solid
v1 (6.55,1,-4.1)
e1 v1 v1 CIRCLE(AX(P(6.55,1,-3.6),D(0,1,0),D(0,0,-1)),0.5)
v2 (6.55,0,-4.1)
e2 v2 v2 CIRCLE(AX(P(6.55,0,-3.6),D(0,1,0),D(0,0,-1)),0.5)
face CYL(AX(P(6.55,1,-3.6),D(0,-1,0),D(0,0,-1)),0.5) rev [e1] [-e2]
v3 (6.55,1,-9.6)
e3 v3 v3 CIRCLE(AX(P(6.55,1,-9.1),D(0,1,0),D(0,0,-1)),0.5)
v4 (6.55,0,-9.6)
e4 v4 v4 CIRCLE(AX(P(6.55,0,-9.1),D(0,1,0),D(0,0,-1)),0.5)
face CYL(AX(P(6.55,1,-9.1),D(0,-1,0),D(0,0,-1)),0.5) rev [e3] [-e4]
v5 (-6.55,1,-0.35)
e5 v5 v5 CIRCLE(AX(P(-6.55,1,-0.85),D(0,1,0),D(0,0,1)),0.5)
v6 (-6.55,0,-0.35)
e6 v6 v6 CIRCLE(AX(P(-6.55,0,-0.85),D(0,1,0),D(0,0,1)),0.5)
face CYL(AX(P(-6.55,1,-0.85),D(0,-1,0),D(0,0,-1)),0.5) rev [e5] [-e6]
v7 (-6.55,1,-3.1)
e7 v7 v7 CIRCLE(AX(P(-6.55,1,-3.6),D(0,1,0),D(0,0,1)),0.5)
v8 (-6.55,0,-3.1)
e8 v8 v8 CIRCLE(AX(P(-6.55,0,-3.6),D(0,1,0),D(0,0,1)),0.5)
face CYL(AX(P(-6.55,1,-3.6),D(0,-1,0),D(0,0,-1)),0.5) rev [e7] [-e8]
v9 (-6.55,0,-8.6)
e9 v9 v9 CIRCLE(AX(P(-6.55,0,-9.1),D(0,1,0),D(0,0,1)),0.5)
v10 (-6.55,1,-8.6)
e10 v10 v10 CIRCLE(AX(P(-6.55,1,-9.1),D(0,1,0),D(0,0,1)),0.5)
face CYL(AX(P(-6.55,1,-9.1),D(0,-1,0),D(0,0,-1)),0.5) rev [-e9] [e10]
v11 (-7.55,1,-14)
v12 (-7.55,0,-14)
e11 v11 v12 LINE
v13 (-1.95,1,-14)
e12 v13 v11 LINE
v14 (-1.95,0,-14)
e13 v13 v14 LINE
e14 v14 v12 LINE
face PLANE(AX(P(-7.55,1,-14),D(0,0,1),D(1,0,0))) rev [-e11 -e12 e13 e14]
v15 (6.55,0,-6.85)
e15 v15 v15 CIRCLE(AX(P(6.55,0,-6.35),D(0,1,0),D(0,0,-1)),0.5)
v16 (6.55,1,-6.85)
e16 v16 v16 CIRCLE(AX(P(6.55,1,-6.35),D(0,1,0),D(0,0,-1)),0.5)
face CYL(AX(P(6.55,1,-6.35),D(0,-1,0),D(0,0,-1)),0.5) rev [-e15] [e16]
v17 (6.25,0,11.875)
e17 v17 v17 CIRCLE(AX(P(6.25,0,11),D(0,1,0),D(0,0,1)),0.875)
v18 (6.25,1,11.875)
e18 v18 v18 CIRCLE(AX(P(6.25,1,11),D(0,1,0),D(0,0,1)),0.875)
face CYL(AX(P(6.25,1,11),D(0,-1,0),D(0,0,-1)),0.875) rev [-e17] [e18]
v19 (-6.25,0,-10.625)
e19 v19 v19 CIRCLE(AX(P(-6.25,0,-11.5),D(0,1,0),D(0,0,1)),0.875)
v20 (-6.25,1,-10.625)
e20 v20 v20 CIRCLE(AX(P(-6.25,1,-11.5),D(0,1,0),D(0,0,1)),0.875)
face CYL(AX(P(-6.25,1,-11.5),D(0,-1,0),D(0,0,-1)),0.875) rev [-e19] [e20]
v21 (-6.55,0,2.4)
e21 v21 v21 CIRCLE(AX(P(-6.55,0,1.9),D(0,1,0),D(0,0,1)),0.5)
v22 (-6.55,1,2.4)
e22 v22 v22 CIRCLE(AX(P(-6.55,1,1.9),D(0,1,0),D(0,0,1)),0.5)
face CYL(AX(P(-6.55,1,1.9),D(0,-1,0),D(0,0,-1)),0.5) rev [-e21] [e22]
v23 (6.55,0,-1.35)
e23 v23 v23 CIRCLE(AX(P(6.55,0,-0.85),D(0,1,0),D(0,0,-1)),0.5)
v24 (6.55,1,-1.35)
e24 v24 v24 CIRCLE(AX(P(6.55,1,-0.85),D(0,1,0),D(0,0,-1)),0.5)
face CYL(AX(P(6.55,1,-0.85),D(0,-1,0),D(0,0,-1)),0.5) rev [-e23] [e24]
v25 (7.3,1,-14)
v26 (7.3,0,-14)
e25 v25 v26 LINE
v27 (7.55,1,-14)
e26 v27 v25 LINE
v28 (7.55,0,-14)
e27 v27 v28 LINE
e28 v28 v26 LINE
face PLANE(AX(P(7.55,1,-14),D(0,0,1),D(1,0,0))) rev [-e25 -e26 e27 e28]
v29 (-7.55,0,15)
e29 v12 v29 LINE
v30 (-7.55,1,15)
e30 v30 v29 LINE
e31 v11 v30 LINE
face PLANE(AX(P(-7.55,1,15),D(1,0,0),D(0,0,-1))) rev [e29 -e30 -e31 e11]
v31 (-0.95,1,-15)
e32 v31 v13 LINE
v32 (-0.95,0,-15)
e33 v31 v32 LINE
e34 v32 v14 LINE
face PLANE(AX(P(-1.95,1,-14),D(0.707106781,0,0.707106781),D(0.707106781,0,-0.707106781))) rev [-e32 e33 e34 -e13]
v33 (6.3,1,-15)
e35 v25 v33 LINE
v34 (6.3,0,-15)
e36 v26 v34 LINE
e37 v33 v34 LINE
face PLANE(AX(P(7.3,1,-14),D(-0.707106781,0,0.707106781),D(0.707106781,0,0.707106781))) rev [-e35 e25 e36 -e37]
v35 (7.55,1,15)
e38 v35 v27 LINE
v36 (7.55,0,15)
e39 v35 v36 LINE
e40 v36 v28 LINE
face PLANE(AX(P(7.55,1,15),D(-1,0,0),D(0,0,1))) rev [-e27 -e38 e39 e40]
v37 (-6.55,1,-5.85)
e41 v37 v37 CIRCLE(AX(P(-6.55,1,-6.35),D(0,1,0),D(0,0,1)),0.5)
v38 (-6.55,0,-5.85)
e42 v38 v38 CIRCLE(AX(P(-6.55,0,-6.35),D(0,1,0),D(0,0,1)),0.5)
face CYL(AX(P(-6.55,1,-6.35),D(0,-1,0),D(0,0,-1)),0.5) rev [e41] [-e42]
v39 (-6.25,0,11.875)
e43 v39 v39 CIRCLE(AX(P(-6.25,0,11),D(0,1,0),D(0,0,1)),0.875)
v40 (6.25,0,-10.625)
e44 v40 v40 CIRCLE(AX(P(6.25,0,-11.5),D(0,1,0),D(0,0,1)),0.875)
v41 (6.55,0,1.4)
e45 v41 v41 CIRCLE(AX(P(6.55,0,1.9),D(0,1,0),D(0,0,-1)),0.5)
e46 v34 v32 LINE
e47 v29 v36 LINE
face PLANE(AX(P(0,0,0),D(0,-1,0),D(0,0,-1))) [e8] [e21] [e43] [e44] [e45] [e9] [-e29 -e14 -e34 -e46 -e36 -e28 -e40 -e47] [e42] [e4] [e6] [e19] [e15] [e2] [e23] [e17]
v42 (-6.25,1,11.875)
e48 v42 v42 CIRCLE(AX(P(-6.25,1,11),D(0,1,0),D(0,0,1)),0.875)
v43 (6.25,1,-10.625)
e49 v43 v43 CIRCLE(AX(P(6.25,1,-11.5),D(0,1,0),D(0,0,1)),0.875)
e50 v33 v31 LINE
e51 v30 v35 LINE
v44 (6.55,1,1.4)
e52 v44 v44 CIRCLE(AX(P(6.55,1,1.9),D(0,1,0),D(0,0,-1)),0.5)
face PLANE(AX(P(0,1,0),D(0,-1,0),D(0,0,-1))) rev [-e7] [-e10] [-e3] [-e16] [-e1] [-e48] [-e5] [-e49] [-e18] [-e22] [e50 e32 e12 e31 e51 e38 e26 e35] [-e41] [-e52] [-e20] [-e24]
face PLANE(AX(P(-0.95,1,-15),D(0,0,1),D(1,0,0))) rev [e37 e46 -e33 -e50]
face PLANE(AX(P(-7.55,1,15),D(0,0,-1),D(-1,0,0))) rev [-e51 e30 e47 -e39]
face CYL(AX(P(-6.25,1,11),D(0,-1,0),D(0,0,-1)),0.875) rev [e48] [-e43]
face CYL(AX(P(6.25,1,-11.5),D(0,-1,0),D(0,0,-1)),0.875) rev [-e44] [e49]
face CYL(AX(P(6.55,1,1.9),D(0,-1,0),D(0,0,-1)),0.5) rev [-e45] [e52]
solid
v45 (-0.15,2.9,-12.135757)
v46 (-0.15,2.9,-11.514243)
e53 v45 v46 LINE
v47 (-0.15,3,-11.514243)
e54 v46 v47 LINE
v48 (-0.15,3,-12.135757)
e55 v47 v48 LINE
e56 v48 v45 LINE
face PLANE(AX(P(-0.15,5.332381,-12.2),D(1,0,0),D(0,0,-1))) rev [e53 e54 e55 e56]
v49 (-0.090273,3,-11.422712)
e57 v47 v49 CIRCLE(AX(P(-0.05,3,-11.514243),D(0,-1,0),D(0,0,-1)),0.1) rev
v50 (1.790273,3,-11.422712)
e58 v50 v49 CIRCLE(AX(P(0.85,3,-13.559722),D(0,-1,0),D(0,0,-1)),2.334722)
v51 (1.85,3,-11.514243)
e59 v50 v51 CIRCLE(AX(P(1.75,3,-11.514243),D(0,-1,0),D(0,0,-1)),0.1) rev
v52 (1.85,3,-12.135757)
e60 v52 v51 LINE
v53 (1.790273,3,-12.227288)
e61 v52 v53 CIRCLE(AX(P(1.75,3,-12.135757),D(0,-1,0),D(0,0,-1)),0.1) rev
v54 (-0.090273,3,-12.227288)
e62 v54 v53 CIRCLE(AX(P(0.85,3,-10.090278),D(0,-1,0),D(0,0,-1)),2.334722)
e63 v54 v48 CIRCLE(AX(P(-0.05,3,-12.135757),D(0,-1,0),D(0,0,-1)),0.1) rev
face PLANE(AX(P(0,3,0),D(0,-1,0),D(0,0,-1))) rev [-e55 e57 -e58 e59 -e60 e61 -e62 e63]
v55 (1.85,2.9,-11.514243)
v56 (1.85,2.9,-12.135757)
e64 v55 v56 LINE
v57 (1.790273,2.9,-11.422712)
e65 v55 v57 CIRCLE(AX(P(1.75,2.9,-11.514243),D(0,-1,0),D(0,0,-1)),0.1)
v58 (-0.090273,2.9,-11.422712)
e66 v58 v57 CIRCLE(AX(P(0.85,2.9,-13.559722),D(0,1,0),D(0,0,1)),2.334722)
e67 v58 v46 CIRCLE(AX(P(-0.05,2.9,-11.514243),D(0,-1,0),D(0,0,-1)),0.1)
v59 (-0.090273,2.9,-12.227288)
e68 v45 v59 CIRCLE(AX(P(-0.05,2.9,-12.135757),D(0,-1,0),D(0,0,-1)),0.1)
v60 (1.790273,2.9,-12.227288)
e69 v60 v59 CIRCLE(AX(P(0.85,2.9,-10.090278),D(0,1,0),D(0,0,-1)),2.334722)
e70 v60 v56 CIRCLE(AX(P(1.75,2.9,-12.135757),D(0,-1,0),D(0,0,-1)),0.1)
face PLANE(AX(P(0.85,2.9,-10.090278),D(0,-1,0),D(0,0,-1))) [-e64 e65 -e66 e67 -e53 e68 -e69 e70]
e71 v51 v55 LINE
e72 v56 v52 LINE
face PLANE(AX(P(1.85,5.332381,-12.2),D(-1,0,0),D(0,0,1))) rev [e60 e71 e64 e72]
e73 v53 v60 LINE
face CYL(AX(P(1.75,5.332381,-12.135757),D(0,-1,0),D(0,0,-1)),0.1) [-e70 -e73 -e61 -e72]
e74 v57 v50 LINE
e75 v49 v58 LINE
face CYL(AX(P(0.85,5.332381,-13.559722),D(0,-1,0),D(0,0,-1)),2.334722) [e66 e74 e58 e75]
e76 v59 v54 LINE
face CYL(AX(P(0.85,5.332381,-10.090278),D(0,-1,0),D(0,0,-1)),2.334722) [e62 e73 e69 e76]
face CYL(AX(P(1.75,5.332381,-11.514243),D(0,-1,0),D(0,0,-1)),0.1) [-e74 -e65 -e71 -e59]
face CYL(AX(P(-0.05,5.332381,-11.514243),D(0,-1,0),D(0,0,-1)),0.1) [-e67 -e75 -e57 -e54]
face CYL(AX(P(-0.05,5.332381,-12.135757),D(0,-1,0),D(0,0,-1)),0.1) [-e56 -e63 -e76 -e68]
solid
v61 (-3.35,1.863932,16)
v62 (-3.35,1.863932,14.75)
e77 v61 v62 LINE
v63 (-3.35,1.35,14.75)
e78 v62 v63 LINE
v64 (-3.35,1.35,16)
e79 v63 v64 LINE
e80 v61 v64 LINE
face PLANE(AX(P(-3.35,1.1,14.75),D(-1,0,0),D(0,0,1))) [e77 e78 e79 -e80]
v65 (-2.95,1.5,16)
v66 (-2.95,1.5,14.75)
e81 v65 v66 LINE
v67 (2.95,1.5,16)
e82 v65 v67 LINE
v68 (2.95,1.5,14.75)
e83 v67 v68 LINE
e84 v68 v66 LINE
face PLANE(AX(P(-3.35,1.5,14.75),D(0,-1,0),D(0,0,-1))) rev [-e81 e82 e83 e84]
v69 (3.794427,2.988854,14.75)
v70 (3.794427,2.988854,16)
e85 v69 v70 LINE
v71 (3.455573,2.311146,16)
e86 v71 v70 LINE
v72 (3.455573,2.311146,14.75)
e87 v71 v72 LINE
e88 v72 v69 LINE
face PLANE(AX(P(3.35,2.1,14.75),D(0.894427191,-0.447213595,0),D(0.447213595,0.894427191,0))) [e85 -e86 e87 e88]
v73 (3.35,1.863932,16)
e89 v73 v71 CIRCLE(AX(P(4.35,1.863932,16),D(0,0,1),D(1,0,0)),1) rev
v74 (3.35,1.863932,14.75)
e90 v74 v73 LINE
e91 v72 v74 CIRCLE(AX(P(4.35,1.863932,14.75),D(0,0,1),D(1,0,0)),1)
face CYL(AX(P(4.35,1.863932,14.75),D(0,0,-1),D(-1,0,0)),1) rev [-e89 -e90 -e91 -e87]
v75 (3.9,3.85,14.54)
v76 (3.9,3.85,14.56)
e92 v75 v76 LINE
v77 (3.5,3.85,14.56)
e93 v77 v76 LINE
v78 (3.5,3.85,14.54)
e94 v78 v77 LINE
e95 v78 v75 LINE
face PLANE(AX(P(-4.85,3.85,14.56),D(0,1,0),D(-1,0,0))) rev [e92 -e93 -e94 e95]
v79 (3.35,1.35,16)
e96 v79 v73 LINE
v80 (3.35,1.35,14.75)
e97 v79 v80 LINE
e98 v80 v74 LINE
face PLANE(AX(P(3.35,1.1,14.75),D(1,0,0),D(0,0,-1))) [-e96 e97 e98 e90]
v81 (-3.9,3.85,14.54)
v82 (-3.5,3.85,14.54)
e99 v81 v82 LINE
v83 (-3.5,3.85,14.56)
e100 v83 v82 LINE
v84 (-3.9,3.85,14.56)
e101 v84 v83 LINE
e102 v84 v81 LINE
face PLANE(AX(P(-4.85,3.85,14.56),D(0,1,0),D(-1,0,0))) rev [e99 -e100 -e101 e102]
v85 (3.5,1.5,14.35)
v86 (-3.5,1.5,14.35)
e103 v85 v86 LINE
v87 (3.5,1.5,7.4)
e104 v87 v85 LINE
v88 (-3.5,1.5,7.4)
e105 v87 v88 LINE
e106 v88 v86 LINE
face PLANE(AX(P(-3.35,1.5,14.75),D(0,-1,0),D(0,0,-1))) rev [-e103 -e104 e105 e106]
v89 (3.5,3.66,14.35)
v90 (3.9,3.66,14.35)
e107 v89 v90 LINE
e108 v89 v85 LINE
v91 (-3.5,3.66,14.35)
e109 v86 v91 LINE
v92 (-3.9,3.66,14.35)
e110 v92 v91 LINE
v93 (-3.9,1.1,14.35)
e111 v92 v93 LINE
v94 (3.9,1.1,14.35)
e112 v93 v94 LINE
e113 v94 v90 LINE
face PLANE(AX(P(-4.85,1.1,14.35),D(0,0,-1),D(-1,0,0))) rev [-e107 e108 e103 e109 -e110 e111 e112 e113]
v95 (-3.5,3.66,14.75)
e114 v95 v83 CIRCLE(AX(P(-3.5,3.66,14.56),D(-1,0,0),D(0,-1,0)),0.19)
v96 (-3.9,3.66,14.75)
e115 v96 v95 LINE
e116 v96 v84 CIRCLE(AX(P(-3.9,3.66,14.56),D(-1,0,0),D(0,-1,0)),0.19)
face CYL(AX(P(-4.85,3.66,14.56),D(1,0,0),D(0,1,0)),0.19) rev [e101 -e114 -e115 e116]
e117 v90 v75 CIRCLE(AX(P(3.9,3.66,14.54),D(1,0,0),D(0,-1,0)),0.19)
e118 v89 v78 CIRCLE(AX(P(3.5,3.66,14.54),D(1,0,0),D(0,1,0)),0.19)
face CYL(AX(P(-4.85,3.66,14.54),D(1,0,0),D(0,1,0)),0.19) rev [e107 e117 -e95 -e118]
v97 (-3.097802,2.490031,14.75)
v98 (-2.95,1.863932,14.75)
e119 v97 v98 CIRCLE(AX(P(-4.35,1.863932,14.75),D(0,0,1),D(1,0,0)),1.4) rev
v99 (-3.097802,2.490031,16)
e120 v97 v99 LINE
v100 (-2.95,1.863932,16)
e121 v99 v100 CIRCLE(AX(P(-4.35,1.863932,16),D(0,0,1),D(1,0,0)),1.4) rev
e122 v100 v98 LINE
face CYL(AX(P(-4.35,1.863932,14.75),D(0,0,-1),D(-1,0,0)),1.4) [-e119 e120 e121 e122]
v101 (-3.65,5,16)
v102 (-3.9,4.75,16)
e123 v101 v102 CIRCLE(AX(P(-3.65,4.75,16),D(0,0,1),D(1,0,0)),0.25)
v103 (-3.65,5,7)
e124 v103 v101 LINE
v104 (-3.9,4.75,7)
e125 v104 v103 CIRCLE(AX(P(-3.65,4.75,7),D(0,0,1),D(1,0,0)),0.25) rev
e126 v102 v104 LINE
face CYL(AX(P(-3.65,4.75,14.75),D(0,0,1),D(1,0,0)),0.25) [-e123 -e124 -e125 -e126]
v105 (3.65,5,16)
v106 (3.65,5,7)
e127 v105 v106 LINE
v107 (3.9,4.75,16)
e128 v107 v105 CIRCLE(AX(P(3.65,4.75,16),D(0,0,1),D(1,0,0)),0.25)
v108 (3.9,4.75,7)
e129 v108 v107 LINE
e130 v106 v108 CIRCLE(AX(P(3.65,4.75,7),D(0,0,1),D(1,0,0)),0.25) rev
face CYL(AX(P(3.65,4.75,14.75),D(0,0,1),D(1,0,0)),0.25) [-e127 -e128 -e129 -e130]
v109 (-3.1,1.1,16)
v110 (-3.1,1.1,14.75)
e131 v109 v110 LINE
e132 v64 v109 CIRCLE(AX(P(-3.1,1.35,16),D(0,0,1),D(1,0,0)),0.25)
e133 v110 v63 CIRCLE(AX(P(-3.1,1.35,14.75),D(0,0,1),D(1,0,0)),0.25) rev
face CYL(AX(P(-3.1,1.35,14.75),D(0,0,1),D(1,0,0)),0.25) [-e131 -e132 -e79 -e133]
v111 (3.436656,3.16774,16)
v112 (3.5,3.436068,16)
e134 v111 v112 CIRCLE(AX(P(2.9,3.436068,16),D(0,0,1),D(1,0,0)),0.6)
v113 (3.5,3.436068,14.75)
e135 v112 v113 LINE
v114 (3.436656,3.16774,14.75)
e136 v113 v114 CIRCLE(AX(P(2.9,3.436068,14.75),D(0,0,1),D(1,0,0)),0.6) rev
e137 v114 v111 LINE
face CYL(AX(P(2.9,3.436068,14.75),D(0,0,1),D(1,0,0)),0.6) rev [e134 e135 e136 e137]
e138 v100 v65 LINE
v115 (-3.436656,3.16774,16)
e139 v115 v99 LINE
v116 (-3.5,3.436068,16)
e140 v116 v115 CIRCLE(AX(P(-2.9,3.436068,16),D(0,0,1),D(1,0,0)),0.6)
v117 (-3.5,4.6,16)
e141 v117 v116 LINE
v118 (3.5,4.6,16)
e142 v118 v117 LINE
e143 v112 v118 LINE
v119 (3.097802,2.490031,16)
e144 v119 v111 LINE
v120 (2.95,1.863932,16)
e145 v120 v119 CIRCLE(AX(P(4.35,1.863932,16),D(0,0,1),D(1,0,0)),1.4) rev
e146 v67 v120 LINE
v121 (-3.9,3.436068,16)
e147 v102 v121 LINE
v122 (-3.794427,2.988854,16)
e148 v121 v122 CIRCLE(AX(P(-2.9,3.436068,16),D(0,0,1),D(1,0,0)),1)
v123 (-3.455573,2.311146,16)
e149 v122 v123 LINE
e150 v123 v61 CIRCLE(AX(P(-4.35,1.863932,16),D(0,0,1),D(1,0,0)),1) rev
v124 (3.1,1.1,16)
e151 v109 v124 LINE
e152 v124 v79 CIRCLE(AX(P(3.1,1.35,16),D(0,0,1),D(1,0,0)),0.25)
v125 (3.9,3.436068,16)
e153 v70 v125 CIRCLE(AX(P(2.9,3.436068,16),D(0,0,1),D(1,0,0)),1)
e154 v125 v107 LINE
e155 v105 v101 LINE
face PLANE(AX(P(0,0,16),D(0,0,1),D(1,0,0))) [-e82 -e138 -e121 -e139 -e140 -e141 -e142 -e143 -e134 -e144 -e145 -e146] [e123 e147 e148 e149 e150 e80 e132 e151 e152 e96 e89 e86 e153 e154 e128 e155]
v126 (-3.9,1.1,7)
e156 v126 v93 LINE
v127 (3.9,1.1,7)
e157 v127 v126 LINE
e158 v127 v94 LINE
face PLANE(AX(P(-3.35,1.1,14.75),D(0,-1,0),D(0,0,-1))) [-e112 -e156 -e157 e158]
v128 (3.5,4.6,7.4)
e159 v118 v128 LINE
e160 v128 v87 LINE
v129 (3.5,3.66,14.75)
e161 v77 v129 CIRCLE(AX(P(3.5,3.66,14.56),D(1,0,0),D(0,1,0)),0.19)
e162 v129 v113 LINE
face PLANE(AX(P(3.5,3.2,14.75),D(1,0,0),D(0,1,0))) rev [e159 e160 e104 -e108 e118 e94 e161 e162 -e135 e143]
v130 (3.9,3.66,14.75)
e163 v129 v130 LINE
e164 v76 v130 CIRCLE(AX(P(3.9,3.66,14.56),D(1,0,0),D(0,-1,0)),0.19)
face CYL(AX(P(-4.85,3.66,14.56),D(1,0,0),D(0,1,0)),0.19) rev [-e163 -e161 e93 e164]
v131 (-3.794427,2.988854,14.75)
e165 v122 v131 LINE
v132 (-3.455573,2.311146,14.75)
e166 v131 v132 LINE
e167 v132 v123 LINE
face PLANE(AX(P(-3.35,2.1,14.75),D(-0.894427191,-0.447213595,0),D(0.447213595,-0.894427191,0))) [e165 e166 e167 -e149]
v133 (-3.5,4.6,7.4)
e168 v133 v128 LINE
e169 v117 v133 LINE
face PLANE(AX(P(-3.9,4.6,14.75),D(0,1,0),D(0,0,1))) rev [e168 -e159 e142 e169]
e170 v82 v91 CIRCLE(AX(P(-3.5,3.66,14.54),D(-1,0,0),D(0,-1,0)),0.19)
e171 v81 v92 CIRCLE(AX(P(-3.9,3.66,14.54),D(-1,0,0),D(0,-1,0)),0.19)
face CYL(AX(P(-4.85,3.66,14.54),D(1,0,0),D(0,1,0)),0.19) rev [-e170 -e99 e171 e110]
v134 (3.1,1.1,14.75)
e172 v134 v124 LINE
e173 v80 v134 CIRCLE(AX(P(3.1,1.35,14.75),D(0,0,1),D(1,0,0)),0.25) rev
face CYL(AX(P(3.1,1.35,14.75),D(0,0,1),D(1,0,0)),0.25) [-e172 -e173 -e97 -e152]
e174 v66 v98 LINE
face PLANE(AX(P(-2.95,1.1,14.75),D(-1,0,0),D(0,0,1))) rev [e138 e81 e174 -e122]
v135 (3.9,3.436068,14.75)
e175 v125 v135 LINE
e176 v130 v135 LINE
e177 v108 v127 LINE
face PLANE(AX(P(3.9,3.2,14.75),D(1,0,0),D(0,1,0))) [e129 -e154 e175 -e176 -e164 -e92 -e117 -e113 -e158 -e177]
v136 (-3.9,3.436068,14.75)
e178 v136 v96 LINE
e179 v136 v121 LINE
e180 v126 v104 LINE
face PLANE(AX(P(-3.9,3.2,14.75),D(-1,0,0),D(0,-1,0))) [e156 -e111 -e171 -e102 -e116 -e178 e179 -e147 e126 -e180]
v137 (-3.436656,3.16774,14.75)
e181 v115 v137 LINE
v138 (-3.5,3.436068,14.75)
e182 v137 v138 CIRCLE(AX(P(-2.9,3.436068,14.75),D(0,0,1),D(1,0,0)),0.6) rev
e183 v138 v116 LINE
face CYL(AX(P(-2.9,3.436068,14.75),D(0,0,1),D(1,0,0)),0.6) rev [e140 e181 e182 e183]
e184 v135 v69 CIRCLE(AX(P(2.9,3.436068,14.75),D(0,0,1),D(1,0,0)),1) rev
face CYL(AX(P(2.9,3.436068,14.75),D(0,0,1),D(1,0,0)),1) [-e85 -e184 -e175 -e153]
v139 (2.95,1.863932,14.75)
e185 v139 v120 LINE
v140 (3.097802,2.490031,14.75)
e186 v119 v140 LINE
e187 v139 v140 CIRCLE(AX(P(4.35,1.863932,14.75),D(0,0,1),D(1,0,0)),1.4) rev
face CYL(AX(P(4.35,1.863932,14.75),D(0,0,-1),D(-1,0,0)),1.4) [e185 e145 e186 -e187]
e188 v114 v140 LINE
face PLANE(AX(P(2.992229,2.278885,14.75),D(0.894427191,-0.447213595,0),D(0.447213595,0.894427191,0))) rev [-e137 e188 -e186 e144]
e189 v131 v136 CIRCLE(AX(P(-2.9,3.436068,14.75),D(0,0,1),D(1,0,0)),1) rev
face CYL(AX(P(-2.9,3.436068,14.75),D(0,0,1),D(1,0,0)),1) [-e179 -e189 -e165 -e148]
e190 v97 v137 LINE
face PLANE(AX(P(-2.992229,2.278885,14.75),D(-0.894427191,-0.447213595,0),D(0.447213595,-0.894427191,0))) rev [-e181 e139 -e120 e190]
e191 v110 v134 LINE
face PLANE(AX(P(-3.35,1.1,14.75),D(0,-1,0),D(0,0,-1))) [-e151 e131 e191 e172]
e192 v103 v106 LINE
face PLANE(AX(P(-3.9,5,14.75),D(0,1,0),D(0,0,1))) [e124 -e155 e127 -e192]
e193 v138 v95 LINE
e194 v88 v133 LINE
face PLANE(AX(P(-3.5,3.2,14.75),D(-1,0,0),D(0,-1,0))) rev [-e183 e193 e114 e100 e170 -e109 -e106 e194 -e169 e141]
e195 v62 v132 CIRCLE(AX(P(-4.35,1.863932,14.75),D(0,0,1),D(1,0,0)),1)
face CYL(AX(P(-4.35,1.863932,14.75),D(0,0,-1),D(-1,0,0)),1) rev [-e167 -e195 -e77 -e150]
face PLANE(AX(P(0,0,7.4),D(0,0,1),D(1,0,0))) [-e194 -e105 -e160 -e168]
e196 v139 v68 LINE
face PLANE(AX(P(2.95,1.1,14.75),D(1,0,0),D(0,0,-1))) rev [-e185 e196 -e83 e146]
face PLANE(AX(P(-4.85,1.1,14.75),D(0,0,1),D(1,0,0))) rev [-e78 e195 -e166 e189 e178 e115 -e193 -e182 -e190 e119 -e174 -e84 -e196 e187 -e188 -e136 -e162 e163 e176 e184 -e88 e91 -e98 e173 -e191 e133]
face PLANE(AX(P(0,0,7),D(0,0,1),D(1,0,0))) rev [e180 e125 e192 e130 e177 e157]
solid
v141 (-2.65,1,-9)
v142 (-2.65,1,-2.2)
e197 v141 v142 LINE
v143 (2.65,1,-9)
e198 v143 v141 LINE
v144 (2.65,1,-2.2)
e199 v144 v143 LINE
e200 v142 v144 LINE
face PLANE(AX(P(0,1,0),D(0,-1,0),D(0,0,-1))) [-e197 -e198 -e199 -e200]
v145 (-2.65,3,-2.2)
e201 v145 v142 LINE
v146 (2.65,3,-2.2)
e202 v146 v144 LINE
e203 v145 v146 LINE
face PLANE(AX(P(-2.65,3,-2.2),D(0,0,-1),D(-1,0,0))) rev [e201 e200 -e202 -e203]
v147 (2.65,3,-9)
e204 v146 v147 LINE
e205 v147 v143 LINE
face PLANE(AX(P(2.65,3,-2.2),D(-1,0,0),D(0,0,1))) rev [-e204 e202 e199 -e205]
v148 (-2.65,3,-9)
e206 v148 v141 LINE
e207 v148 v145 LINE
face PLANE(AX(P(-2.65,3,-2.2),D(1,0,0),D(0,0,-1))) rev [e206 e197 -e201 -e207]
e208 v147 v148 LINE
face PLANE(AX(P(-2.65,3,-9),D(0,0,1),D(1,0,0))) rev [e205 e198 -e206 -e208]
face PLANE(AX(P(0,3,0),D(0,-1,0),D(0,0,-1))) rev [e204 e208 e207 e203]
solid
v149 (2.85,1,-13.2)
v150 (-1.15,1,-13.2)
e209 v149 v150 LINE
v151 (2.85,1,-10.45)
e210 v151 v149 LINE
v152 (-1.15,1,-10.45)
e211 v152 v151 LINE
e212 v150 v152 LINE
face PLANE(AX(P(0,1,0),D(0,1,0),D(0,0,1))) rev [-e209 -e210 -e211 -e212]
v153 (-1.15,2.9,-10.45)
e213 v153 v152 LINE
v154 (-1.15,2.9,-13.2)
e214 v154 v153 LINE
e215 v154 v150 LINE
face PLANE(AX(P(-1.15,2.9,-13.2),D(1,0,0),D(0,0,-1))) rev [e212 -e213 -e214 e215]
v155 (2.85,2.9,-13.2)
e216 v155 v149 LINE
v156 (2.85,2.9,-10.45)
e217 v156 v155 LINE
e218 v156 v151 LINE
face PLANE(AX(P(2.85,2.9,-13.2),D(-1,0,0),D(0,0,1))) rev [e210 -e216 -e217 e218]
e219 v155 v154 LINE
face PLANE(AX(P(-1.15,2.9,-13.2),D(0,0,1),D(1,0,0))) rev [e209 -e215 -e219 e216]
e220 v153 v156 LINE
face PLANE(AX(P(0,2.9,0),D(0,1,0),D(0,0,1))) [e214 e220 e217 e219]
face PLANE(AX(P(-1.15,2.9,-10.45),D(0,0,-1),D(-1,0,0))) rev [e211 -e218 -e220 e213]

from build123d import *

# Parameters (mm, degrees)
SKETCH1_R                = 0.875
SKETCH1_R_2              = 0.5
BOSS_EXTRUDE1_DEPTH      = 1
BOSS_EXTRUDE2_DEPTH      = 1
BOSS_EXTRUDE2_DEPTH_BACK = 0.25
SKETCH3_W                = 7.8
SKETCH3_H                = 3.9
BOSS_EXTRUDE3_DEPTH      = 7.75
FILLET1_R                = 0.25
FILLET2_R                = 1
SHELL1_START             = 7.4
SHELL1_DEPTH             = 8.6
SHELL1_2_DEPTH           = 6.95
CUT_EXTRUDE1_DEPTH       = 8.75
SKETCH6_W                = 5.3
SKETCH6_H                = 6.8
BOSS_EXTRUDE4_DEPTH      = 2
SKETCH7_W                = 4
SKETCH7_H                = 2.75
BOSS_EXTRUDE5_DEPTH      = 1.9
BOSS_EXTRUDE6_DEPTH      = 0.1
FILLET3_R                = 0.1


# Read off the part's stored shape, not the designer's step: Shell1
with BuildPart() as part:
    # Sketch1 → Boss-Extrude1 (new body)
    with BuildSketch(Plane(origin=(0, 0, 0), x_dir=(1, 0, 0), z_dir=(0, 1, 0))):
        Polygon((-7.55, 14), (-1.95, 14), (-0.95, 15), (6.3, 15), (7.3, 14), (7.55, 14), (7.55, -15), (-7.55, -15), align=None)
        with Locations(Location((-6.25, 11.5, 0), (0, 0, 270))):
            Circle(SKETCH1_R, mode=Mode.SUBTRACT)
        with Locations(Location((6.25, 11.5, 0), (0, 0, 270))):
            Circle(SKETCH1_R, mode=Mode.SUBTRACT)
        with Locations(Location((-6.25, -11, 0), (0, 0, 270))):
            Circle(SKETCH1_R, mode=Mode.SUBTRACT)
        with Locations(Location((6.25, -11, 0), (0, 0, 270))):
            Circle(SKETCH1_R, mode=Mode.SUBTRACT)
        with Locations(Location((-6.55, 9.1, 0), (0, 0, 270))):
            Circle(SKETCH1_R_2, mode=Mode.SUBTRACT)
        with Locations(Location((-6.55, -1.9, 0), (0, 0, 270))):
            Circle(SKETCH1_R_2, mode=Mode.SUBTRACT)
        with Locations(Location((-6.55, 3.6, 0), (0, 0, 270))):
            Circle(SKETCH1_R_2, mode=Mode.SUBTRACT)
        with Locations(Location((-6.55, 6.35, 0), (0, 0, 270))):
            Circle(SKETCH1_R_2, mode=Mode.SUBTRACT)
        with Locations(Location((-6.55, 0.85, 0), (0, 0, 270))):
            Circle(SKETCH1_R_2, mode=Mode.SUBTRACT)
        with Locations(Location((6.55, -1.9, 0), (0, 0, 90))):
            Circle(SKETCH1_R_2, mode=Mode.SUBTRACT)
        with Locations(Location((6.55, 0.85, 0), (0, 0, 90))):
            Circle(SKETCH1_R_2, mode=Mode.SUBTRACT)
        with Locations(Location((6.55, 3.6, 0), (0, 0, 90))):
            Circle(SKETCH1_R_2, mode=Mode.SUBTRACT)
        with Locations(Location((6.55, 6.35, 0), (0, 0, 90))):
            Circle(SKETCH1_R_2, mode=Mode.SUBTRACT)
        with Locations(Location((6.55, 9.1, 0), (0, 0, 90))):
            Circle(SKETCH1_R_2, mode=Mode.SUBTRACT)
    extrude(amount=BOSS_EXTRUDE1_DEPTH)


with BuildPart() as body_2:
    # Sketch2 → Boss-Extrude2 (new, two sides: drawn at the far end of the back side and taken through both)
    with BuildSketch(Plane.XY.offset(15).offset(-BOSS_EXTRUDE2_DEPTH_BACK)):
        Polygon((3.35, 1.1), (3.35, 2.1), (3.9, 3.2), (3.9, 5), (-3.9, 5), (-3.9, 3.2), (-3.35, 2.1), (-3.35, 1.1), align=None)
    extrude(amount=BOSS_EXTRUDE2_DEPTH + BOSS_EXTRUDE2_DEPTH_BACK)

    # Sketch3 → Boss-Extrude3 (add)
    with BuildSketch(Plane(origin=(0, 0, 14.75), x_dir=(-1, 0, 0), z_dir=(0, 0, -1))):
        with Locations((0, 3.05)):
            Rectangle(SKETCH3_W, SKETCH3_H)
    extrude(amount=BOSS_EXTRUDE3_DEPTH)

    # Fillet1
    fillet1_edges = [body_2.edges().sort_by_distance(p)[0] for p in [
        (3.35, 1.1, 15.375),
        (-3.35, 1.1, 15.375),
        (3.9, 5, 11.5),
        (-3.9, 5, 11.5),
    ]]
    fillet(fillet1_edges, radius=FILLET1_R)

    # Fillet2
    fillet2_edges = [body_2.edges().sort_by_distance(p)[0] for p in [
        (3.9, 3.2, 15.375),
        (3.35, 2.1, 15.375),
        (-3.35, 2.1, 15.375),
        (-3.9, 3.2, 15.375),
    ]]
    fillet(fillet2_edges, radius=FILLET2_R)

    # Shell1 outline → Shell1 (cut)
    with BuildSketch(Plane.XY.offset(SHELL1_START)):
        with BuildLine():
            Line((-2.95, 1.863932023), (-2.95, 1.5))
            Line((-2.95, 1.5), (2.95, 1.5))
            Line((2.95, 1.5), (2.95, 1.863932023))
            ThreePointArc((2.95, 1.863932023), (2.987451415, 2.185586111), (3.097801933, 2.490031056))
            Line((3.097801933, 2.490031056), (3.436656315, 3.16773982))
            ThreePointArc((3.436656315, 3.16773982), (3.483949394, 3.298216225), (3.5, 3.436067977))
            Line((3.5, 3.436067977), (3.5, 4.6))
            Line((3.5, 4.6), (-3.5, 4.6))
            Line((-3.5, 4.6), (-3.5, 3.436067977))
            ThreePointArc((-3.5, 3.436067977), (-3.483949394, 3.298216225), (-3.436656315, 3.16773982))
            Line((-3.436656315, 3.16773982), (-3.097801933, 2.490031056))
            ThreePointArc((-3.097801933, 2.490031056), (-2.987451415, 2.185586111), (-2.95, 1.863932023))
        make_face()
    extrude(amount=SHELL1_DEPTH, mode=Mode.SUBTRACT)

    # Shell1 2 outline → Shell1 2 (cut)
    with BuildSketch(Plane.XY.offset(SHELL1_START)):
        with BuildLine():
            Line((-3.5, 3.436067977), (-3.5, 1.5))
            Line((-3.5, 1.5), (-2.95, 1.5))
            Line((-2.95, 1.5), (-2.95, 1.863932023))
            ThreePointArc((-2.95, 1.863932023), (-2.987451415, 2.185586111), (-3.097801933, 2.490031056))
            Line((-3.097801933, 2.490031056), (-3.436656315, 3.16773982))
            ThreePointArc((-3.436656315, 3.16773982), (-3.483949394, 3.298216225), (-3.5, 3.436067977))
        make_face()
        with BuildLine():
            Line((2.95, 1.863932023), (2.95, 1.5))
            Line((2.95, 1.5), (3.5, 1.5))
            Line((3.5, 1.5), (3.5, 3.436067977))
            ThreePointArc((3.5, 3.436067977), (3.483949394, 3.298216225), (3.436656315, 3.16773982))
            Line((3.436656315, 3.16773982), (3.097801933, 2.490031056))
            ThreePointArc((3.097801933, 2.490031056), (2.987451415, 2.185586111), (2.95, 1.863932023))
        make_face()
    extrude(amount=SHELL1_2_DEPTH, mode=Mode.SUBTRACT)

    # Sketch5 → Cut-Extrude1 (cut)
    with BuildSketch(Plane(origin=(3.9, 0, 0), x_dir=(0, 0, -1), z_dir=(1, 0, 0))):
        with BuildLine():
            Line((-14.75, 1.1), (-14.35, 1.1))
            Line((-14.35, 1.1), (-14.35, 3.66))
            ThreePointArc((-14.35, 3.66), (-14.405649712, 3.794350288), (-14.54, 3.85))
            Line((-14.54, 3.85), (-14.56, 3.85))
            ThreePointArc((-14.56, 3.85), (-14.694350288, 3.794350288), (-14.75, 3.66))
            Line((-14.75, 3.66), (-14.75, 1.1))
        make_face()
    extrude(amount=-CUT_EXTRUDE1_DEPTH, mode=Mode.SUBTRACT)


with BuildPart() as body_3:
    # Sketch6 → Boss-Extrude4 (new body)
    with BuildSketch(Plane(origin=(0, 1, 0), x_dir=(1, 0, 0), z_dir=(0, 1, 0))):
        with Locations((0, 5.6)):
            Rectangle(SKETCH6_W, SKETCH6_H)
    extrude(amount=BOSS_EXTRUDE4_DEPTH)


with BuildPart() as body_4:
    # Sketch7 → Boss-Extrude5 (new body)
    with BuildSketch(Plane(origin=(0, 1, 0), x_dir=(1, 0, 0), z_dir=(0, 1, 0))):
        with Locations((0.85, 11.825)):
            Rectangle(SKETCH7_W, SKETCH7_H)
    extrude(amount=BOSS_EXTRUDE5_DEPTH)


with BuildPart() as body_5:
    # Sketch8 → Boss-Extrude6 (new body)
    with BuildSketch(Plane(origin=(0, 2.9, 0), x_dir=(1, 0, 0), z_dir=(0, 1, 0))):
        with BuildLine():
            Line((-0.15, 12.2), (-0.15, 11.45))
            ThreePointArc((-0.15, 11.45), (0.85, 11.225), (1.85, 11.45))
            Line((1.85, 11.45), (1.85, 12.2))
            ThreePointArc((1.85, 12.2), (0.85, 12.425), (-0.15, 12.2))
        make_face()
    extrude(amount=BOSS_EXTRUDE6_DEPTH)

    # Fillet3
    fillet3_edges = [body_5.edges().sort_by_distance(p)[0] for p in [
        (1.85, 2.95, -12.2),
        (1.85, 2.95, -11.45),
        (-0.15, 2.95, -11.45),
        (-0.15, 2.95, -12.2),
    ]]
    fillet(fillet3_edges, radius=FILLET3_R)


solid = Compound([part.part, body_2.part, body_3.part, body_4.part, body_5.part])
